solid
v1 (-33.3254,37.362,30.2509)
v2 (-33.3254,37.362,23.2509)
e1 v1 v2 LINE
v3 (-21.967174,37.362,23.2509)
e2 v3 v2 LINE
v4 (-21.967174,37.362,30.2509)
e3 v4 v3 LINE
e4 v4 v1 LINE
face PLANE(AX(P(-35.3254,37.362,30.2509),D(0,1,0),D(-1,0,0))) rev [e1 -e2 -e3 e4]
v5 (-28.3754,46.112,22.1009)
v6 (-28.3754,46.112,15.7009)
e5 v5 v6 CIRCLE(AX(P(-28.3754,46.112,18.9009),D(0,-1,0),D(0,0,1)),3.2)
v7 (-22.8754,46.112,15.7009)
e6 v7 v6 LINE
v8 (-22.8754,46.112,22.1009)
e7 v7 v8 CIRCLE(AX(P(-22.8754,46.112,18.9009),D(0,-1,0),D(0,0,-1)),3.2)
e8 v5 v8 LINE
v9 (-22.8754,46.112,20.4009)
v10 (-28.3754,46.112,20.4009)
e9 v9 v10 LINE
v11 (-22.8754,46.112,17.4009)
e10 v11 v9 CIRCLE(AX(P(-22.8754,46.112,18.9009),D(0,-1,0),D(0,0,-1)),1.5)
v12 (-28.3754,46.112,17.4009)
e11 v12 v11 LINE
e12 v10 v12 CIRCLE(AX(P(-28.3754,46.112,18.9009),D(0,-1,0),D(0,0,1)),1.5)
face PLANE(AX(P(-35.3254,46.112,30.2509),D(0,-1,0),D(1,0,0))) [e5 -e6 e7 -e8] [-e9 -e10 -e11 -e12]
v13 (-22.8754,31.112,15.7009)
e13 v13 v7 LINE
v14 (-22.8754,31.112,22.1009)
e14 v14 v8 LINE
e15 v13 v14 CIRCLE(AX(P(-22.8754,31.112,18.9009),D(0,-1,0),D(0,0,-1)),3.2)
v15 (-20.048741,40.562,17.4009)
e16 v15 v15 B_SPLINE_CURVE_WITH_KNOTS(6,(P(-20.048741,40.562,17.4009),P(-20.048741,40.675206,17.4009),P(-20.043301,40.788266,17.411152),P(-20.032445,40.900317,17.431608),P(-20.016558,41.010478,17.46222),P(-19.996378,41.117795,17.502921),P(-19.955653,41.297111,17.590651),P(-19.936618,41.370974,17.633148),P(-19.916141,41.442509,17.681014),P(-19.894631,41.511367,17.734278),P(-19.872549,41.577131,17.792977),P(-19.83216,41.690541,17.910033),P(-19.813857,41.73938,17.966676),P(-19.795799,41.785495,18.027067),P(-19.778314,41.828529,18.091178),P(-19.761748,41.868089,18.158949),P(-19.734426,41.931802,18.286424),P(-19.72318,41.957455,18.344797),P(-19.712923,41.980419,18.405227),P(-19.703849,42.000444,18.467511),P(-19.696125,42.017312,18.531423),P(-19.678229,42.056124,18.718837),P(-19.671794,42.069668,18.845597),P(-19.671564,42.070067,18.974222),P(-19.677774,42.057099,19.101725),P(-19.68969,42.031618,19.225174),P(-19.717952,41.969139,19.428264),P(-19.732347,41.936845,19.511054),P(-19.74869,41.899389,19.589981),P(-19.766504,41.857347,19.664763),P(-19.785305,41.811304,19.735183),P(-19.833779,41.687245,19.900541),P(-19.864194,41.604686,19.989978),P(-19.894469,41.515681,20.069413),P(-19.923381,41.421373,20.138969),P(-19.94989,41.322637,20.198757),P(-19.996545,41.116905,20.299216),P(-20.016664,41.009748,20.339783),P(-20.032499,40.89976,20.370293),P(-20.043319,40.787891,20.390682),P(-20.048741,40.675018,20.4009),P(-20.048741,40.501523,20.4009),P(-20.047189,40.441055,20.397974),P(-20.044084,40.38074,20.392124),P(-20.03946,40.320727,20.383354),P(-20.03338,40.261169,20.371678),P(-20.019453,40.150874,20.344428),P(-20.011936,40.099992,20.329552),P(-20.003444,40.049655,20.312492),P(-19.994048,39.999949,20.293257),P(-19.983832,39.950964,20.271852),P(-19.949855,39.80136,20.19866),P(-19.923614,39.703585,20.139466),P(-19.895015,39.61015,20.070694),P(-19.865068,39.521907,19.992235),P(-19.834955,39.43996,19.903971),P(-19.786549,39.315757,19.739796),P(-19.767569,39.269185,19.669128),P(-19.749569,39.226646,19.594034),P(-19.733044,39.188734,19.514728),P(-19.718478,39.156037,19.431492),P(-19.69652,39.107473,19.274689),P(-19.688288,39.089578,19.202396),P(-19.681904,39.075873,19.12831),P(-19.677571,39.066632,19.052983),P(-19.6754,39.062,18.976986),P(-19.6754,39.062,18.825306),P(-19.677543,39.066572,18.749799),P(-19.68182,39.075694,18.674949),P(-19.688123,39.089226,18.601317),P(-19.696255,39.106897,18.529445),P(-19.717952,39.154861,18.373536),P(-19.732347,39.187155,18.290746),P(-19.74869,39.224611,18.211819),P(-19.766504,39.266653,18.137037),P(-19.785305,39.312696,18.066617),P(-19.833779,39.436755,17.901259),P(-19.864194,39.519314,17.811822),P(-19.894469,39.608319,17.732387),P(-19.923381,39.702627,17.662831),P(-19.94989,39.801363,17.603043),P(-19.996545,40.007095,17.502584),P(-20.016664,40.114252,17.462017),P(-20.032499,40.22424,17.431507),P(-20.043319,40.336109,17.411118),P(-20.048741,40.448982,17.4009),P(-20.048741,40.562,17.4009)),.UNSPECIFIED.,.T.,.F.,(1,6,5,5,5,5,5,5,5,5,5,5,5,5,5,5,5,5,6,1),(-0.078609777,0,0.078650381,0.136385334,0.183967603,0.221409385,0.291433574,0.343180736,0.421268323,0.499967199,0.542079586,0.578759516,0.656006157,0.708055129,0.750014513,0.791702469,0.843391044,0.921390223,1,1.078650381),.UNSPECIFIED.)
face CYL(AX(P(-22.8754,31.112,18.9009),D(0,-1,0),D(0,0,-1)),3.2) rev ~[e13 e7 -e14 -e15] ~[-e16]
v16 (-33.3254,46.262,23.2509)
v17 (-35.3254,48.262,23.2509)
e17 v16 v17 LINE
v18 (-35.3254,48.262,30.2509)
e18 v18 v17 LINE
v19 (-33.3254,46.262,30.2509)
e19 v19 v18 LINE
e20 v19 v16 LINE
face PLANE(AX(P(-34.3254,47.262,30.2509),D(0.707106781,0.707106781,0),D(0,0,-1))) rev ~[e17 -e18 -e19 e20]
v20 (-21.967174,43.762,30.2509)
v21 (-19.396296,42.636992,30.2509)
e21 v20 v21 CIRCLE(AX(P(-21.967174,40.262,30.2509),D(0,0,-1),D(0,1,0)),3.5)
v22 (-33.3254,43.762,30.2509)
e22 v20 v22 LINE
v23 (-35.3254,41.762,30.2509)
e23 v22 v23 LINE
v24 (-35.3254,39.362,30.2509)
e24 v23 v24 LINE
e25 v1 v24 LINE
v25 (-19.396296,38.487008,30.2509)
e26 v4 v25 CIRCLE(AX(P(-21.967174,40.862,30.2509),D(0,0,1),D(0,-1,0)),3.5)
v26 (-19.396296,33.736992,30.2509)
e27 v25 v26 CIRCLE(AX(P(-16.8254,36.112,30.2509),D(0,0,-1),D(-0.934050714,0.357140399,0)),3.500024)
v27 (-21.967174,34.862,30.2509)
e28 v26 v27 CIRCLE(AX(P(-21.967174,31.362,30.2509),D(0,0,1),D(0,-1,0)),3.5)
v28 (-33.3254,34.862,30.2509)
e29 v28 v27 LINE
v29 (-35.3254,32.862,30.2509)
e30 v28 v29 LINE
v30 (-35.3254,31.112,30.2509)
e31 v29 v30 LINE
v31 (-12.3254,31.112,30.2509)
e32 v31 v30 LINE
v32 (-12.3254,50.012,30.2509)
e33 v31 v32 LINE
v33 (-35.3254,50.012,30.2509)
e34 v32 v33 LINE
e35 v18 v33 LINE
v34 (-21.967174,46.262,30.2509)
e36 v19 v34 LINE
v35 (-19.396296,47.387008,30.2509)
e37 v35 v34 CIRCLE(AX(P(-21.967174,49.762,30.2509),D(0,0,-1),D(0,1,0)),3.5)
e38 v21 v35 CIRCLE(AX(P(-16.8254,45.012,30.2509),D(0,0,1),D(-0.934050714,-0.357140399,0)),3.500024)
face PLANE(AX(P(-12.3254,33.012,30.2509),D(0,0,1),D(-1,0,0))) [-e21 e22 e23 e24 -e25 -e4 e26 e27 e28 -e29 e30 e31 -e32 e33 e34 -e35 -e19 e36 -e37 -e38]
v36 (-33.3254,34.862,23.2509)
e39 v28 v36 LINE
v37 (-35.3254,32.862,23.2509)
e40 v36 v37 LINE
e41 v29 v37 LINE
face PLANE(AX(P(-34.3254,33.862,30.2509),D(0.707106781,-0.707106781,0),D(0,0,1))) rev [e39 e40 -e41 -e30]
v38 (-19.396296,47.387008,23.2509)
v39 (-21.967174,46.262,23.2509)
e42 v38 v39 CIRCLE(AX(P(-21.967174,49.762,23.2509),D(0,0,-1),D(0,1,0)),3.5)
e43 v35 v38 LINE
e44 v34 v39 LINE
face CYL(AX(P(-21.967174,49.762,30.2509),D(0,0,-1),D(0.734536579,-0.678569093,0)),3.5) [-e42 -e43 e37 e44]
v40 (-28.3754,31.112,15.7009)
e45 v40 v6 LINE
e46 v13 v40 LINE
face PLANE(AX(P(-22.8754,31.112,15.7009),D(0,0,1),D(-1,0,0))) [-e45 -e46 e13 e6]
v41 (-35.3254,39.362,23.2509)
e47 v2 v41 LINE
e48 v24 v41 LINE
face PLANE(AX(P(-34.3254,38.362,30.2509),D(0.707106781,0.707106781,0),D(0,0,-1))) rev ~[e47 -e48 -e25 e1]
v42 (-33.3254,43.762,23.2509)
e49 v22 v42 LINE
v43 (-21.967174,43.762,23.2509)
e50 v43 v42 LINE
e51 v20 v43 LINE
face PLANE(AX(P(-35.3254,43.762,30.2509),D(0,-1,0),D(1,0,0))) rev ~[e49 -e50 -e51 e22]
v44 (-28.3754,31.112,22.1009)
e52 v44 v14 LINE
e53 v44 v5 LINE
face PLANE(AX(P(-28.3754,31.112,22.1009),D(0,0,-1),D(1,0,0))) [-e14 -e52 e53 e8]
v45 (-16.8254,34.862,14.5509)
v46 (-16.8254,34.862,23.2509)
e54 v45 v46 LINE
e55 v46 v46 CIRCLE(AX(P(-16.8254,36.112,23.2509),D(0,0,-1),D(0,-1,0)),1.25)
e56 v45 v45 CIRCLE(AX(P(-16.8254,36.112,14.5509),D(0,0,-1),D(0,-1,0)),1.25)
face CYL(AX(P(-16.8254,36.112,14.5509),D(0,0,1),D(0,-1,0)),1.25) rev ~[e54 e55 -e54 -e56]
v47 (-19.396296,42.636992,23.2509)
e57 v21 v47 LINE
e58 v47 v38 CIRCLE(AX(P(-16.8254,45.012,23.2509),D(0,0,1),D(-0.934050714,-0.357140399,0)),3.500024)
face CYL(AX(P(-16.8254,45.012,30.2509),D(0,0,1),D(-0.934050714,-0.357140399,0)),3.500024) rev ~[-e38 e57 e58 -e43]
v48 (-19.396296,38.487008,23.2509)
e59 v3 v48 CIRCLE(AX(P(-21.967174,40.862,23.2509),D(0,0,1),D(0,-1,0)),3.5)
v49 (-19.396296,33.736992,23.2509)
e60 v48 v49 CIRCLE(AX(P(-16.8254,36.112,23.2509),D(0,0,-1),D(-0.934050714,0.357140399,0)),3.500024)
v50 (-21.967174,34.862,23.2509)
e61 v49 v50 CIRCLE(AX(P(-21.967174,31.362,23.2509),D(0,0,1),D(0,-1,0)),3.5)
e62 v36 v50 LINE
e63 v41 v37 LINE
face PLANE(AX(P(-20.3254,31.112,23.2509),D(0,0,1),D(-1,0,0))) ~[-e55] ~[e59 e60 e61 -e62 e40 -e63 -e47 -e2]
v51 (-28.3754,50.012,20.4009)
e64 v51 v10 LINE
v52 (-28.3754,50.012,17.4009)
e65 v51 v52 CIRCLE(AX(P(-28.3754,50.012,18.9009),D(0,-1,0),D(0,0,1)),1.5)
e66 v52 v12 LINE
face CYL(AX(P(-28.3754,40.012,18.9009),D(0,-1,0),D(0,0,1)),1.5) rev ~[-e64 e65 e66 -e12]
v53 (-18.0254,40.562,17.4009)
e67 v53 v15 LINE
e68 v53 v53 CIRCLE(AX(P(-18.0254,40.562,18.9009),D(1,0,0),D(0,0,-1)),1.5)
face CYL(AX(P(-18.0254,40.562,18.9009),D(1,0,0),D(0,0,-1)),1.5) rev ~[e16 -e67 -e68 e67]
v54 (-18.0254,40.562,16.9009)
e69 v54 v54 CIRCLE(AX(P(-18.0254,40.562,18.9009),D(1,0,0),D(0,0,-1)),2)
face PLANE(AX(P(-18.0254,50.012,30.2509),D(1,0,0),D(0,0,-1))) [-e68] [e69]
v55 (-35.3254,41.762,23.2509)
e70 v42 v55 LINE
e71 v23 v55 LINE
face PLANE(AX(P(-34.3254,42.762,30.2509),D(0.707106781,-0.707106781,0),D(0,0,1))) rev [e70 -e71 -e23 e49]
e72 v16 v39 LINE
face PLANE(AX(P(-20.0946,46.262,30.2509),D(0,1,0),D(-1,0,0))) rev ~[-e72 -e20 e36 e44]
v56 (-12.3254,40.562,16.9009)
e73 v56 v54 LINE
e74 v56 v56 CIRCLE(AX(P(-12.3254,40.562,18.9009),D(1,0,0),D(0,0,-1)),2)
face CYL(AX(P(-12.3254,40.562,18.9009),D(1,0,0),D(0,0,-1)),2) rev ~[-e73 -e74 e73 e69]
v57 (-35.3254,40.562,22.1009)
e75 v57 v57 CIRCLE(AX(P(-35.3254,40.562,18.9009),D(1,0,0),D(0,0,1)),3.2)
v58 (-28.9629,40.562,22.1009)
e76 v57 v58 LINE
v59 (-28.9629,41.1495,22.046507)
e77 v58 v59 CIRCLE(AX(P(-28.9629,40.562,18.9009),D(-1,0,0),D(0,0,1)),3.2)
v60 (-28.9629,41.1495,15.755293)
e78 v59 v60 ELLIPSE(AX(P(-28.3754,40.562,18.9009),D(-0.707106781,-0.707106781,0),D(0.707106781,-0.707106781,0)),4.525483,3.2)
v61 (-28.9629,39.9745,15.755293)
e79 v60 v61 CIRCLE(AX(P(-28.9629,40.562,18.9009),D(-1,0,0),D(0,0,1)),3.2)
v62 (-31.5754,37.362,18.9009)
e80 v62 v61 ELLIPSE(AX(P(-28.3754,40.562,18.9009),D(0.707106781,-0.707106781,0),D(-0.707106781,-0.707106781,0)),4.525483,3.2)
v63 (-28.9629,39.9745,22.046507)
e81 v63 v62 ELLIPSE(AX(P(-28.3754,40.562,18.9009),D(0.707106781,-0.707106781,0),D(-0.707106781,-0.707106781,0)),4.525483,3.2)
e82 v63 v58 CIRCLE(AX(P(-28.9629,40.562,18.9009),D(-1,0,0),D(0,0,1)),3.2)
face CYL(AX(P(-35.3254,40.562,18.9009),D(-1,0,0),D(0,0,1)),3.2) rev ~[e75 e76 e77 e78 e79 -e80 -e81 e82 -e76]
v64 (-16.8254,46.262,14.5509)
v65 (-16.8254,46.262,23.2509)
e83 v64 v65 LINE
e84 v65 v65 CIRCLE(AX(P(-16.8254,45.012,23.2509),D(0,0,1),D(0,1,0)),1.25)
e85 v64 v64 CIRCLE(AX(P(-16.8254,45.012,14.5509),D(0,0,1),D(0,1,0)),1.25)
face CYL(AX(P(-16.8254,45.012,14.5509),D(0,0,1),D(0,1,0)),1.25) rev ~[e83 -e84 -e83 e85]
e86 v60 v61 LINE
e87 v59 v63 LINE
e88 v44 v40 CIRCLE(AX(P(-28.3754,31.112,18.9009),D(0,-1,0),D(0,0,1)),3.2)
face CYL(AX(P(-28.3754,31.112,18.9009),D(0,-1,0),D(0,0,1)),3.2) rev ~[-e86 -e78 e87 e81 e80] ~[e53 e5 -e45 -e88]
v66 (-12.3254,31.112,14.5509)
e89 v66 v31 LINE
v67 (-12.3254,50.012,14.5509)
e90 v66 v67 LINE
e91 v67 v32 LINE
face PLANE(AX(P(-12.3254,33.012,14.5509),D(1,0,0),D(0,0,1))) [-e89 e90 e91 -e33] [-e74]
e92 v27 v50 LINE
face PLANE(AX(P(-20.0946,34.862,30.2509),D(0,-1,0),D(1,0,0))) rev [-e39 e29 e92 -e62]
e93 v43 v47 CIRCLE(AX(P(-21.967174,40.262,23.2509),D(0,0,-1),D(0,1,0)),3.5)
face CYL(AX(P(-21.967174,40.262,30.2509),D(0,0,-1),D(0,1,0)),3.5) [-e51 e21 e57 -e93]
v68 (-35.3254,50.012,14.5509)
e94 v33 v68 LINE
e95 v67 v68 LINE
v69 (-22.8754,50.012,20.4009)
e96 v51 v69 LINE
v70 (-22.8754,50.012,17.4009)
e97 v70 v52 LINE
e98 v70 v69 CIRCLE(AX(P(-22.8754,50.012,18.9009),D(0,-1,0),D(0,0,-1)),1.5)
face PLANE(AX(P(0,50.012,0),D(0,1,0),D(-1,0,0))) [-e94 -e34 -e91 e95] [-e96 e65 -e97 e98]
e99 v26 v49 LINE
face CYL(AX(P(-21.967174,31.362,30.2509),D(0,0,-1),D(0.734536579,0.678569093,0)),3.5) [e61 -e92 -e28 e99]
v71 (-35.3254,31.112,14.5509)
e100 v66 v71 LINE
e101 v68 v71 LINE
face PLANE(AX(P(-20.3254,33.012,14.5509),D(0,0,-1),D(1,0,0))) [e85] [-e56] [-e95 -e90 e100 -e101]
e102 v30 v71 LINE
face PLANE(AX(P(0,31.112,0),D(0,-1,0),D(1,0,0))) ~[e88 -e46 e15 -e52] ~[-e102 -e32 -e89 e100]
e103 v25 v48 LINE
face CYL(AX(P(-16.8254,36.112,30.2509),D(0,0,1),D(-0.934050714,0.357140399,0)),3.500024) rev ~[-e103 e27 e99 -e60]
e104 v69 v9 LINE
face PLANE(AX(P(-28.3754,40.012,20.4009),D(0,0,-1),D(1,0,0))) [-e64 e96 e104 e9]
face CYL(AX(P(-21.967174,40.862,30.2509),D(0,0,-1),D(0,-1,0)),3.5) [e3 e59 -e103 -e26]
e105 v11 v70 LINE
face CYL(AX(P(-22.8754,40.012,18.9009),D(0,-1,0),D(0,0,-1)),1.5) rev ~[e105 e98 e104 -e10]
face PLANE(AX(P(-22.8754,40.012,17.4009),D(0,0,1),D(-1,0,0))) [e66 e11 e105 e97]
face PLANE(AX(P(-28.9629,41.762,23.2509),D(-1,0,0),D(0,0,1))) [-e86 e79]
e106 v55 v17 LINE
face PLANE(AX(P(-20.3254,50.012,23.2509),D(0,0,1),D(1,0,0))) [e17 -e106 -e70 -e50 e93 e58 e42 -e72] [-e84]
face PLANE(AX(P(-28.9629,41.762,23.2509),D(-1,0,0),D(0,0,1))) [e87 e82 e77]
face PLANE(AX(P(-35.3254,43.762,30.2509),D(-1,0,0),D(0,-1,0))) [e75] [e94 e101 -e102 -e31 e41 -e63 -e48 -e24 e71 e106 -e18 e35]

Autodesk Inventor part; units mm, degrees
ref_plane "Work Plane1" through (0, 33.012, 0) normal (0, 1, 0) x (-1, 0, 0)
sketch "Sketch1" plane through (0, 33.012, 0) normal (0, 1, 0) x (-1, 0, 0)
  line L0 (12.3254, 14.5509) -> (12.3254, 30.2509)
  line L1 (20.3254, 14.5509) -> (12.3254, 14.5509)
  line L2 (12.3254, 30.2509) -> (20.3254, 30.2509)
  line L3 (20.3254, 30.2509) -> (20.3254, 14.5509)
extrude "Extrusion12" add sketch "Sketch1" along normal blind 17
sketch "Sketch2" plane through (-20.3254, 33.012, 30.2509) normal (0, 0, 1) x (1, 0, 0)
  arc A0 (0.2308, 10.75) -> (0.2308, 13.25) centre (3.5, 12) ccw
  line L0 (-0.0992, 10.75) -> (-0.0992, 13.25)
  line L1 (0.2308, 10.75) -> (-0.0992, 10.75)
  line L2 (0.2308, 13.25) -> (-0.0992, 13.25)
  circle A1 centre (3.5, 12) radius 1.5
  dimension "d52" = 2.5
  dimension "d66" = 3
  dimension "d67" = 2
extrude "Extrusion11" cut sketch "Sketch2" against normal blind 7 draft 0 contours L1 L0 L2 A0 | A1
sketch "Sketch3" plane through (-20.3254, 33.012, 14.5509) normal (-1, 0, 0) x (0, 0, 1)
  line L0 (6.75, 5.0877) -> (6.75, 0)
  line L1 (1.25, 0) -> (1.25, 5.0877)
  line L2 (4, 6.6754) -> (6.75, 5.0877)
  line L3 (1.25, 5.0877) -> (4, 6.6754)
  line L4 (6.75, 0) -> (1.25, 0)
extrude "Extrusion10" cut sketch "Sketch3" against normal blind 2.5
sketch "Sketch4" plane through (0, 33.012, 0) normal (0, 1, 0) x (-1, 0, 0)
  line L0 (12.3254, 30.2509) -> (31.3754, 30.2509)
  line L1 (20.3254, 14.5509) -> (20.3254, 22.5509)
  line L2 (12.3254, 22.5509) -> (12.3254, 30.2509)
  line L3 (20.3254, 14.5509) -> (31.3754, 14.5509)
  line L4 (20.3254, 22.5509) -> (12.3254, 22.5509)
  line L5 (31.3754, 30.2509) -> (31.3754, 14.5509)
extrude "Extrusion9" cut sketch "Sketch4" along normal blind 7 draft 0
ref_plane "Work Plane2" through (0, 0, 19.2509) normal (0, 0, 1) x (1, 0, 0)
sketch "Sketch12" plane through (-20.3254, 50.012, 30.2509) normal (0, 0, 1) x (1, 0, 0)
  line L0 (0, -17) -> (0, 0) projected
  line L1 (0, 0) -> (-15, 0)
  line L2 (-15, 0) -> (-15, -10)
  line L3 (-15, -10) -> (0, -10)
  line L4 (0, -10) -> (0, 0)
  line L5 (0, -6.25) -> (0, -3.75) projected
  line L6 (0, -3.75) -> (-15, -3.75)
  line L7 (-15, -3.75) -> (-15, -6.25)
  line L8 (-15, -6.25) -> (0, -6.25)
  line L9 (0, -6.25) -> (0, -3.75)
  line L10 (0, -10) -> (8, -10) projected
  line L11 (8, -10) -> (8, 0) projected
  point P0 (20.3254, -50.012)
  point P1 (-15, -6.25)
  dimension "d44" = 23
extrude "Extrusion15" add sketch "Sketch12" against normal up to surface (15.7 mm away)
extrude "Extrusion16" cut sketch "Sketch12" against normal up to surface (7 mm away) contours L8 L2 L6 L0
sketch "Sketch6" plane through (0, 40.012, 0) normal (0, -1, 0) x (1, 0, 0)
  line L0 (-22.8754, 17.4009) -> (-28.3754, 17.4009)
  arc A0 (-28.3754, 20.4009) -> (-28.3754, 17.4009) centre (-28.3754, 18.9009) ccw
  line L1 (-28.3754, 20.4009) -> (-22.8754, 20.4009)
  arc A1 (-22.8754, 17.4009) -> (-22.8754, 20.4009) centre (-22.8754, 18.9009) ccw
extrude "Extrusion7" cut sketch "Sketch6" against normal blind 10 draft 0
sketch "Sketch7" plane through (-12.3254, 33.012, 14.5509) normal (0, 0, -1) x (-1, 0, 0)
  point P0 (4.5, 12)
hole "Hole6" at (-16.8254, 45.012, 14.5509) direction (0, 0, 1) diameter 2.5 end through all
sketch "Sketch9" plane through (-17.8254, 33.012, 14.5509) normal (-1, 0, 0) x (0, 0, 1)
  point P0 (4, 3.5)
hole "Hole4" at (-17.8254, 36.512, 18.5509) direction (1, 0, 0) diameter 3 depth 5.5
fillet "Fillet8" radius 2.5 1 edges at (-20.3254, 33.012, 21.9259)
fillet "Fillet7" radius 2.5 1 edges at (-20.3254, 33.012, 15.1759)
fillet "Fillet6" radius 3.5 1 edges at (-20.0946, 43.762, 26.7509)
fillet "Fillet5" radius 3.5 1 edges at (-20.0946, 46.262, 26.7509)
chamfer "Chamfer1" [suppressed]
chamfer "Chamfer2" distance 2 angle 45 2 edges at (-35.3254, 46.262, 26.7509) (-35.3254, 43.762, 26.7509)
sketch "Sketch14" plane through (-20.3254, 40.012, 22.5509) normal (0, 0, 1) x (1, 0, 0)
  arc A0 (0, -4.5) -> (2.5, -7) centre (2.5, -4.5) ccw projected
  line L0 (0, -1.9123) -> (0, -4.5) projected
  line L1 (0, -1.9123) -> (2.5, -1.9123) projected
  line L2 (2.5, -1.9123) -> (2.5, -7) projected
  line L3 (0, -1.9123) -> (2.5, -7)
  arc A1 (0, -4.5) -> (2.5, -7) centre (2.5, -4.5) ccw projected
  point P0 (20.3254, -40.012)
  point P1 (2.5, -7)
extrude "Extrusion18" cut sketch "Sketch14" against normal blind 1.3875 contours L0 L3 A0
ref_plane "Work Plane3" through (-21.9672, 40.562, 30.2509) normal (0, 1, 0) x (1, 0, 0)
sketch "Sketch15" plane through (0, 33.012, 0) normal (0, -1, 0) x (1, 0, 0)
  line L0 (-25.3064, 10.3119) -> (-9.5646, 10.3119)
  line L1 (-9.5646, 10.3119) -> (-9.5646, 26.9005)
  line L2 (-9.5646, 26.9005) -> (-25.3064, 26.9005)
  line L3 (-25.3064, 26.9005) -> (-25.3064, 10.3119)
  point P0 (0, 0)
extrude "Extrusion19" cut sketch "Sketch15" against normal up to surface (7 mm away)
mirror "Mirror1" about plane through (-21.9672, 40.562, 30.2509) normal (0, 1, 0)
sketch "Sketch16" plane through (-35.3254, 31.112, 30.2509) normal (0, -1, 0) x (1, 0, 0)
  line L0 (0, 0) -> (0, -15.7) projected
  line L1 (23, -15.7) -> (0, -15.7) projected
  line L2 (23, 0) -> (23, -15.7) projected
  line L3 (23, 0) -> (0, 0) projected
  arc A0 (12.45, -12.85) -> (12.45, -9.85) centre (12.45, -11.35) ccw projected
  line L4 (6.95, -12.85) -> (12.45, -12.85) projected
  arc A1 (6.95, -9.85) -> (6.95, -12.85) centre (6.95, -11.35) ccw projected
  line L5 (12.45, -9.85) -> (6.95, -9.85) projected
  arc A2 (12.45, -14.55) -> (12.45, -8.15) centre (12.45, -11.35) ccw
  line L6 (12.45, -14.55) -> (6.95, -14.55)
  arc A3 (6.95, -8.15) -> (6.95, -14.55) centre (6.95, -11.35) ccw
  line L7 (6.95, -8.15) -> (12.45, -8.15)
  point P0 (35.3254, -30.2509)
  dimension "d71" = 3.2
extrude "Extrusion20" cut sketch "Sketch16" against normal blind 15 contours L6 A3 L7 A2
sketch "Sketch18" plane through (-12.3254, 50.012, 30.2509) normal (1, 0, 0) x (0, 0, -1)
  circle A0 centre (11.35, -9.45) radius 2
  line L0 (15.7, -18.9) -> (15.7, 0) projected
  line L1 (15.7, -9.45) -> (7, -9.45) construction
  line L2 (7, -8.5) -> (7, -1.5) projected
  line L3 (7, -10.4) -> (7, -17.4) projected
  point P0 (30.2509, -50.012)
  point P1 (7, -2.625)
  point P2 (7, -7.375)
  point P3 (7, -16.275)
  point P4 (7, -11.525)
  dimension "d78" = 4
extrude "Extrusion22" cut sketch "Sketch18" against normal blind 5.7
sketch "Sketch19" plane through (-18.0254, 40.562, 18.9009) normal (1, 0, 0) x (0, 0, -1)
  circle A0 centre (0, 0) radius 2 projected
  circle A1 centre (0, 0) radius 1.5
  point P0 (18.9009, -40.562)
  dimension "d81" = 3
extrude "Extrusion23" cut sketch "Sketch19" against normal blind 6.3625 contours A1
sketch "Sketch20" plane through (-35.3254, 41.762, 23.2509) normal (-1, 0, 0) x (0, 0, 1)
  circle A0 centre (-4.35, -1.2) radius 3.2
  circle A1 centre (-4.35, -1.2) radius 1.5 projected
  line L0 (-7.55, -10.65) -> (-7.55, 4.35) projected
  line L1 (-1.15, -10.65) -> (-1.15, 4.35) projected
  point P0 (-23.2509, -41.762)
extrude "Extrusion24" cut sketch "Sketch20" against normal blind 6.3625 contours A0 | A1
